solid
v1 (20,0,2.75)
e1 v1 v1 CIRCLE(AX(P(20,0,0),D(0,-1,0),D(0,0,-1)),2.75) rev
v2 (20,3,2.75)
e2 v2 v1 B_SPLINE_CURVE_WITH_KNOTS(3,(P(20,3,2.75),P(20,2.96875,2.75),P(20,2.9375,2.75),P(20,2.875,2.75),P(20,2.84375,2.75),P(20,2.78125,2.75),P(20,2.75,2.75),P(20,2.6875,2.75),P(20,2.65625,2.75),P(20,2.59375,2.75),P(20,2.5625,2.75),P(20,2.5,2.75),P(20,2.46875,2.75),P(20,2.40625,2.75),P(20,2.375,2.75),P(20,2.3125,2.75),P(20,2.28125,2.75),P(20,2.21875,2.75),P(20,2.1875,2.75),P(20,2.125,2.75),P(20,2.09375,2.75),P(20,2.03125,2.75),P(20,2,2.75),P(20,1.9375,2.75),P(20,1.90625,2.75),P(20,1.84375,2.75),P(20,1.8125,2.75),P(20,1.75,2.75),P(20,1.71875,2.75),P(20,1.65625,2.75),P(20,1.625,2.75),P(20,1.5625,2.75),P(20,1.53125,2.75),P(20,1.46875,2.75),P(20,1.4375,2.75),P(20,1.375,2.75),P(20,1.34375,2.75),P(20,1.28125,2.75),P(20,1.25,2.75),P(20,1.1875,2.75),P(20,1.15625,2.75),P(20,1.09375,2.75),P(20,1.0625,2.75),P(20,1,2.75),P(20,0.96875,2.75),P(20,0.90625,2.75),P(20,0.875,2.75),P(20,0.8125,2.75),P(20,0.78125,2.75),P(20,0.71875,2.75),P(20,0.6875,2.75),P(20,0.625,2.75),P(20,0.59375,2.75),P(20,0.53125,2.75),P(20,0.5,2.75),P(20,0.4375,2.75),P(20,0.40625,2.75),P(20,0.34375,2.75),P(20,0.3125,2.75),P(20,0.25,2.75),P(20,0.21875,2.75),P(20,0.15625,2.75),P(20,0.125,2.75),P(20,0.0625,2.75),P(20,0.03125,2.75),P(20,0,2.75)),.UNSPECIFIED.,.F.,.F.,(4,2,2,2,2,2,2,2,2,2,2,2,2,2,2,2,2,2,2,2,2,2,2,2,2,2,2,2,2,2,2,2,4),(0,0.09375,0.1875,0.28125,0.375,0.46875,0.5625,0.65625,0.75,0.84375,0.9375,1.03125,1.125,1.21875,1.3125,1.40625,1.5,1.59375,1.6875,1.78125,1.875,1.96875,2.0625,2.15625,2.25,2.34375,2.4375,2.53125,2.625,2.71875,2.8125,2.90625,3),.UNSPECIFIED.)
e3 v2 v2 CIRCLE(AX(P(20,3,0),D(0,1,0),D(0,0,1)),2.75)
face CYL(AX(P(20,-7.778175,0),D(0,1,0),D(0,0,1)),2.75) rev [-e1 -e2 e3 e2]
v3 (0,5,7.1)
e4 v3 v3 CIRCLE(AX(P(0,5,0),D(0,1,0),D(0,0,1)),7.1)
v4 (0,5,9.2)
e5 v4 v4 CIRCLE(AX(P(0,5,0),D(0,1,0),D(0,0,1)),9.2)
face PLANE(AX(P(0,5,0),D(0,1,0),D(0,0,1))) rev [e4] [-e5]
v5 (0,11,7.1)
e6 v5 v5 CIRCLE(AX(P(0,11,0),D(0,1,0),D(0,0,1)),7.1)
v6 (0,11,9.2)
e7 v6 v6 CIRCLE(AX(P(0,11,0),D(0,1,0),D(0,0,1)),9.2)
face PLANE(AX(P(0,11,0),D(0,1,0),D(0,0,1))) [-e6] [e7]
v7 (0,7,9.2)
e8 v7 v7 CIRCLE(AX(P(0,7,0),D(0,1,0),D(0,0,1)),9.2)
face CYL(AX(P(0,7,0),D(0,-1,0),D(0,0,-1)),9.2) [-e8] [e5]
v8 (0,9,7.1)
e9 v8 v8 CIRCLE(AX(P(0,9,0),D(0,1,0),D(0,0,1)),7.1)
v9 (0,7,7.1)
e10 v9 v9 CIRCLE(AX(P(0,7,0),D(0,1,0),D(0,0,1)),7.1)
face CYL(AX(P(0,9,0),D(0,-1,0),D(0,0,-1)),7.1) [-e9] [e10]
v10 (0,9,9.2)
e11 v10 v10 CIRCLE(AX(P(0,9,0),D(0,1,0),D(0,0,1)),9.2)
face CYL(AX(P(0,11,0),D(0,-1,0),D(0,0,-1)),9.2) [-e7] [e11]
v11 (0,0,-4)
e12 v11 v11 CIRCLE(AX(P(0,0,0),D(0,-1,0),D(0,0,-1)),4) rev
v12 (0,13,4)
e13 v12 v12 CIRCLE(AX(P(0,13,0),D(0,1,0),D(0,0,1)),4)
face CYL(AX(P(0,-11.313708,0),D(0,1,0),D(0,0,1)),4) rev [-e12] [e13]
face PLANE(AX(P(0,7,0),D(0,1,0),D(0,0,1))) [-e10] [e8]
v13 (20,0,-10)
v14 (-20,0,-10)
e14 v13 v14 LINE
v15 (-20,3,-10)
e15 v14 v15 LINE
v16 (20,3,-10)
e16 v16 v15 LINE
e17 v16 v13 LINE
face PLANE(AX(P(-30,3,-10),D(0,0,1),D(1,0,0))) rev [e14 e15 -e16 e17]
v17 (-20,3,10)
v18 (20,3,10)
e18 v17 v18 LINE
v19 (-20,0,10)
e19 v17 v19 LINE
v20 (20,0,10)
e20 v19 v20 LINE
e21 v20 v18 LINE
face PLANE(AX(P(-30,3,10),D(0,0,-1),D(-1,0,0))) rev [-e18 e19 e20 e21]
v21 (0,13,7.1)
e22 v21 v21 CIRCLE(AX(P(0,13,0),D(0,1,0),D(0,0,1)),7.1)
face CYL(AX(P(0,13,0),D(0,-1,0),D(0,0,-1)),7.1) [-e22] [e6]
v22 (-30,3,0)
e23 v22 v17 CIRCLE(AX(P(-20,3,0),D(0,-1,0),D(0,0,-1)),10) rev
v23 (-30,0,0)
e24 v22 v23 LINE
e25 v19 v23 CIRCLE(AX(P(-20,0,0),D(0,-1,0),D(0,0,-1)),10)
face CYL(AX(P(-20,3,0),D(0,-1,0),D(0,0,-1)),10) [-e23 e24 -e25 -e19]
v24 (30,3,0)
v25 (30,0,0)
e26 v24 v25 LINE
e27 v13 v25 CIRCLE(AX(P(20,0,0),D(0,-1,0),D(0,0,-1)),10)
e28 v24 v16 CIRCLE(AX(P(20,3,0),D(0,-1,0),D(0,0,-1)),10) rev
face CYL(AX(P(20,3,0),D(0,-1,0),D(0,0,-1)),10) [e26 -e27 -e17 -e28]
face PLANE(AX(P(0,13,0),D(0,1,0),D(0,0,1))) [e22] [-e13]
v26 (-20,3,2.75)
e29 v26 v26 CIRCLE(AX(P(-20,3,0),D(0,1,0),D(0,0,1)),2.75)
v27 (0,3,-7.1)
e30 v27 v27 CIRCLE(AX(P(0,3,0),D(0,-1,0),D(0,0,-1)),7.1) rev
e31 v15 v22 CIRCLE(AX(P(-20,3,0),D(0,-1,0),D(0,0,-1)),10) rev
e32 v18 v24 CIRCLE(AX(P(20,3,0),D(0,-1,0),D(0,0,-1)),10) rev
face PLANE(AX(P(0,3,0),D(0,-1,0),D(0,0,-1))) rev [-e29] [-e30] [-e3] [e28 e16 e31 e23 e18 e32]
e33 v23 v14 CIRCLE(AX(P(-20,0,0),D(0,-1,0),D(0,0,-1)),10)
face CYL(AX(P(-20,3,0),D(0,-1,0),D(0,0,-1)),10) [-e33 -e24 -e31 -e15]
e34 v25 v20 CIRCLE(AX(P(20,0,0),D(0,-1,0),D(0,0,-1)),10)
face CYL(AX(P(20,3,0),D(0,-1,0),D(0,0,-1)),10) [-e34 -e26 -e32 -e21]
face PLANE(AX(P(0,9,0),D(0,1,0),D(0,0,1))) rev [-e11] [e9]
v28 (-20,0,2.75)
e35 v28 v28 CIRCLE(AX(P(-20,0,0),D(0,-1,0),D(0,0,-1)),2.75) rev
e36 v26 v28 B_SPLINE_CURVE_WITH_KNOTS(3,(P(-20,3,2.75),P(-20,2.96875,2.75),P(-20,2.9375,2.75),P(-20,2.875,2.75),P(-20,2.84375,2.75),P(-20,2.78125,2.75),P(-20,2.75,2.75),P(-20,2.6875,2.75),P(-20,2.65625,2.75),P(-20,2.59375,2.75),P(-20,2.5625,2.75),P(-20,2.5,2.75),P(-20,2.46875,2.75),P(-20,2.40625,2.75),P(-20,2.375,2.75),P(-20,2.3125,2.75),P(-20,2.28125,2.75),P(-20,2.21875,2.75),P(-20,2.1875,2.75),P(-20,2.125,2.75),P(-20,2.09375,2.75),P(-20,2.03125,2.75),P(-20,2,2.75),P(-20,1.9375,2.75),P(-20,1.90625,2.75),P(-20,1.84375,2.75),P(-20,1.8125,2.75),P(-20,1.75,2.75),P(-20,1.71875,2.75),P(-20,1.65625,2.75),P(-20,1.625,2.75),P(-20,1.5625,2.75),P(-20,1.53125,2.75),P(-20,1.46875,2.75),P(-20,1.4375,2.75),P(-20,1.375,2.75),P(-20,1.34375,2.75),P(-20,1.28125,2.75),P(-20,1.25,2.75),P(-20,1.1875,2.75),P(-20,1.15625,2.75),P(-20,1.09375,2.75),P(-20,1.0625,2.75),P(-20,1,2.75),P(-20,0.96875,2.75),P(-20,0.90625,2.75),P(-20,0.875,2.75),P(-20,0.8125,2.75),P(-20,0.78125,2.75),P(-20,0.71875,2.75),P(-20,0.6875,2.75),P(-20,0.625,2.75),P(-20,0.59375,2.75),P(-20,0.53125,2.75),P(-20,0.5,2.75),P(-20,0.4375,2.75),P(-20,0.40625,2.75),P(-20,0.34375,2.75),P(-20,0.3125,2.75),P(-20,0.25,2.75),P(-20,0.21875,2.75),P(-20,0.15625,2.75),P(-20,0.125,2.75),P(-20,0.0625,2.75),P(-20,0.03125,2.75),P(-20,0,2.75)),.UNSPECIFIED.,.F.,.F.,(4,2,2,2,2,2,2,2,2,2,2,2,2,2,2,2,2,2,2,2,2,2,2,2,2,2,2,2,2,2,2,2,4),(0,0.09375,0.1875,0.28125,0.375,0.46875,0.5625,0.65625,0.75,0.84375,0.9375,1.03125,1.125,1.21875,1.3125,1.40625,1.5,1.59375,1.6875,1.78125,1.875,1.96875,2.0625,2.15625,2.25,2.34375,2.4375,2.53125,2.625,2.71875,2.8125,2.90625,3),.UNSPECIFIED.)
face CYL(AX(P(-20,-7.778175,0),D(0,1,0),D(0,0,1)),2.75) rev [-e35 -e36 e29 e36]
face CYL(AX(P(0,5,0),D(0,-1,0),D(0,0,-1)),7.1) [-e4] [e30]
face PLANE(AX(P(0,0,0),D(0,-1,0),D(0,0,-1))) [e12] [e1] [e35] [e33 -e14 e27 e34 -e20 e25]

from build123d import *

# Parameters (mm, degrees)
SKETCH1_W            = 60
SKETCH1_H            = 20
BOSS_EXTRUDE1_DEPTH  = 3
FILLET1_R            = 10
SKETCH36_R           = 7.1
BOSS_EXTRUDE15_DEPTH = 2
SKETCH37_R           = 9.2
BOSS_EXTRUDE16_DEPTH = 2
SKETCH39_R           = 7.1
BOSS_EXTRUDE18_DEPTH = 2
SKETCH40_R           = 9.2
BOSS_EXTRUDE19_DEPTH = 2
SKETCH41_R           = 7.1
BOSS_EXTRUDE20_DEPTH = 2
SKETCH42_R           = 4
CUT_EXTRUDE5_DEPTH   = 13
SKETCH43_R           = 2.75
CUT_EXTRUDE6_DEPTH   = 3


with BuildPart() as part:
    # Sketch1 → Boss-Extrude1 (new body)
    with BuildSketch(Plane(origin=(0, 0, 0), x_dir=(1, 0, 0), z_dir=(0, 1, 0))):
        Rectangle(SKETCH1_W, SKETCH1_H)
    extrude(amount=BOSS_EXTRUDE1_DEPTH)

    # Fillet1
    fillet1_edges = [part.edges().sort_by_distance(p)[0] for p in [
        (30, 1.5, -10),
        (30, 1.5, 10),
        (-30, 1.5, 10),
        (-30, 1.5, -10),
    ]]
    fillet(fillet1_edges, radius=FILLET1_R - 0.0001)  # a hair under: the kernel refuses the full size

    # Sketch36 → Boss-Extrude15 (add)
    with BuildSketch(Plane(origin=(0, 3, 0), x_dir=(1, 0, 0), z_dir=(0, 1, 0))):
        with Locations(Location((0, 0, 0), (0, 0, 90))):
            Circle(SKETCH36_R)
    extrude(amount=BOSS_EXTRUDE15_DEPTH)

    # Sketch37 → Boss-Extrude16 (add)
    with BuildSketch(Plane(origin=(0, 5, 0), x_dir=(1, 0, 0), z_dir=(0, 1, 0))):
        with Locations(Location((0, 0, 0), (0, 0, 270))):
            Circle(SKETCH37_R)
    extrude(amount=BOSS_EXTRUDE16_DEPTH)

    # Sketch39 → Boss-Extrude18 (add)
    with BuildSketch(Plane(origin=(0, 7, 0), x_dir=(1, 0, 0), z_dir=(0, 1, 0))):
        with Locations(Location((0, 0, 0), (0, 0, 90))):
            Circle(SKETCH39_R)
    extrude(amount=BOSS_EXTRUDE18_DEPTH)

    # Sketch40 → Boss-Extrude19 (add)
    with BuildSketch(Plane(origin=(0, 9, 0), x_dir=(1, 0, 0), z_dir=(0, 1, 0))):
        with Locations(Location((0, 0, 0), (0, 0, 270))):
            Circle(SKETCH40_R)
    extrude(amount=BOSS_EXTRUDE19_DEPTH)

    # Sketch41 → Boss-Extrude20 (add)
    with BuildSketch(Plane(origin=(0, 11, 0), x_dir=(1, 0, 0), z_dir=(0, 1, 0))):
        with Locations(Location((0, 0, 0), (0, 0, 90))):
            Circle(SKETCH41_R)
    extrude(amount=BOSS_EXTRUDE20_DEPTH)

    # Sketch42 → Cut-Extrude5 (cut)
    with BuildSketch(Plane(origin=(0, 13, 0), x_dir=(1, 0, 0), z_dir=(0, 1, 0))):
        with Locations(Location((0, 0, 0), (0, 0, 270))):
            Circle(SKETCH42_R)
    extrude(amount=-CUT_EXTRUDE5_DEPTH, mode=Mode.SUBTRACT)

    # Sketch43 → Cut-Extrude6 (cut)
    with BuildSketch(Plane(origin=(0, 3, 0), x_dir=(1, 0, 0), z_dir=(0, 1, 0))):
        with Locations(Location((-20, 0, 0), (0, 0, 270))):
            Circle(SKETCH43_R)
        with Locations(Location((20, 0, 0), (0, 0, 270))):
            Circle(SKETCH43_R)
    extrude(amount=-CUT_EXTRUDE6_DEPTH, mode=Mode.SUBTRACT)


solid = part.part
